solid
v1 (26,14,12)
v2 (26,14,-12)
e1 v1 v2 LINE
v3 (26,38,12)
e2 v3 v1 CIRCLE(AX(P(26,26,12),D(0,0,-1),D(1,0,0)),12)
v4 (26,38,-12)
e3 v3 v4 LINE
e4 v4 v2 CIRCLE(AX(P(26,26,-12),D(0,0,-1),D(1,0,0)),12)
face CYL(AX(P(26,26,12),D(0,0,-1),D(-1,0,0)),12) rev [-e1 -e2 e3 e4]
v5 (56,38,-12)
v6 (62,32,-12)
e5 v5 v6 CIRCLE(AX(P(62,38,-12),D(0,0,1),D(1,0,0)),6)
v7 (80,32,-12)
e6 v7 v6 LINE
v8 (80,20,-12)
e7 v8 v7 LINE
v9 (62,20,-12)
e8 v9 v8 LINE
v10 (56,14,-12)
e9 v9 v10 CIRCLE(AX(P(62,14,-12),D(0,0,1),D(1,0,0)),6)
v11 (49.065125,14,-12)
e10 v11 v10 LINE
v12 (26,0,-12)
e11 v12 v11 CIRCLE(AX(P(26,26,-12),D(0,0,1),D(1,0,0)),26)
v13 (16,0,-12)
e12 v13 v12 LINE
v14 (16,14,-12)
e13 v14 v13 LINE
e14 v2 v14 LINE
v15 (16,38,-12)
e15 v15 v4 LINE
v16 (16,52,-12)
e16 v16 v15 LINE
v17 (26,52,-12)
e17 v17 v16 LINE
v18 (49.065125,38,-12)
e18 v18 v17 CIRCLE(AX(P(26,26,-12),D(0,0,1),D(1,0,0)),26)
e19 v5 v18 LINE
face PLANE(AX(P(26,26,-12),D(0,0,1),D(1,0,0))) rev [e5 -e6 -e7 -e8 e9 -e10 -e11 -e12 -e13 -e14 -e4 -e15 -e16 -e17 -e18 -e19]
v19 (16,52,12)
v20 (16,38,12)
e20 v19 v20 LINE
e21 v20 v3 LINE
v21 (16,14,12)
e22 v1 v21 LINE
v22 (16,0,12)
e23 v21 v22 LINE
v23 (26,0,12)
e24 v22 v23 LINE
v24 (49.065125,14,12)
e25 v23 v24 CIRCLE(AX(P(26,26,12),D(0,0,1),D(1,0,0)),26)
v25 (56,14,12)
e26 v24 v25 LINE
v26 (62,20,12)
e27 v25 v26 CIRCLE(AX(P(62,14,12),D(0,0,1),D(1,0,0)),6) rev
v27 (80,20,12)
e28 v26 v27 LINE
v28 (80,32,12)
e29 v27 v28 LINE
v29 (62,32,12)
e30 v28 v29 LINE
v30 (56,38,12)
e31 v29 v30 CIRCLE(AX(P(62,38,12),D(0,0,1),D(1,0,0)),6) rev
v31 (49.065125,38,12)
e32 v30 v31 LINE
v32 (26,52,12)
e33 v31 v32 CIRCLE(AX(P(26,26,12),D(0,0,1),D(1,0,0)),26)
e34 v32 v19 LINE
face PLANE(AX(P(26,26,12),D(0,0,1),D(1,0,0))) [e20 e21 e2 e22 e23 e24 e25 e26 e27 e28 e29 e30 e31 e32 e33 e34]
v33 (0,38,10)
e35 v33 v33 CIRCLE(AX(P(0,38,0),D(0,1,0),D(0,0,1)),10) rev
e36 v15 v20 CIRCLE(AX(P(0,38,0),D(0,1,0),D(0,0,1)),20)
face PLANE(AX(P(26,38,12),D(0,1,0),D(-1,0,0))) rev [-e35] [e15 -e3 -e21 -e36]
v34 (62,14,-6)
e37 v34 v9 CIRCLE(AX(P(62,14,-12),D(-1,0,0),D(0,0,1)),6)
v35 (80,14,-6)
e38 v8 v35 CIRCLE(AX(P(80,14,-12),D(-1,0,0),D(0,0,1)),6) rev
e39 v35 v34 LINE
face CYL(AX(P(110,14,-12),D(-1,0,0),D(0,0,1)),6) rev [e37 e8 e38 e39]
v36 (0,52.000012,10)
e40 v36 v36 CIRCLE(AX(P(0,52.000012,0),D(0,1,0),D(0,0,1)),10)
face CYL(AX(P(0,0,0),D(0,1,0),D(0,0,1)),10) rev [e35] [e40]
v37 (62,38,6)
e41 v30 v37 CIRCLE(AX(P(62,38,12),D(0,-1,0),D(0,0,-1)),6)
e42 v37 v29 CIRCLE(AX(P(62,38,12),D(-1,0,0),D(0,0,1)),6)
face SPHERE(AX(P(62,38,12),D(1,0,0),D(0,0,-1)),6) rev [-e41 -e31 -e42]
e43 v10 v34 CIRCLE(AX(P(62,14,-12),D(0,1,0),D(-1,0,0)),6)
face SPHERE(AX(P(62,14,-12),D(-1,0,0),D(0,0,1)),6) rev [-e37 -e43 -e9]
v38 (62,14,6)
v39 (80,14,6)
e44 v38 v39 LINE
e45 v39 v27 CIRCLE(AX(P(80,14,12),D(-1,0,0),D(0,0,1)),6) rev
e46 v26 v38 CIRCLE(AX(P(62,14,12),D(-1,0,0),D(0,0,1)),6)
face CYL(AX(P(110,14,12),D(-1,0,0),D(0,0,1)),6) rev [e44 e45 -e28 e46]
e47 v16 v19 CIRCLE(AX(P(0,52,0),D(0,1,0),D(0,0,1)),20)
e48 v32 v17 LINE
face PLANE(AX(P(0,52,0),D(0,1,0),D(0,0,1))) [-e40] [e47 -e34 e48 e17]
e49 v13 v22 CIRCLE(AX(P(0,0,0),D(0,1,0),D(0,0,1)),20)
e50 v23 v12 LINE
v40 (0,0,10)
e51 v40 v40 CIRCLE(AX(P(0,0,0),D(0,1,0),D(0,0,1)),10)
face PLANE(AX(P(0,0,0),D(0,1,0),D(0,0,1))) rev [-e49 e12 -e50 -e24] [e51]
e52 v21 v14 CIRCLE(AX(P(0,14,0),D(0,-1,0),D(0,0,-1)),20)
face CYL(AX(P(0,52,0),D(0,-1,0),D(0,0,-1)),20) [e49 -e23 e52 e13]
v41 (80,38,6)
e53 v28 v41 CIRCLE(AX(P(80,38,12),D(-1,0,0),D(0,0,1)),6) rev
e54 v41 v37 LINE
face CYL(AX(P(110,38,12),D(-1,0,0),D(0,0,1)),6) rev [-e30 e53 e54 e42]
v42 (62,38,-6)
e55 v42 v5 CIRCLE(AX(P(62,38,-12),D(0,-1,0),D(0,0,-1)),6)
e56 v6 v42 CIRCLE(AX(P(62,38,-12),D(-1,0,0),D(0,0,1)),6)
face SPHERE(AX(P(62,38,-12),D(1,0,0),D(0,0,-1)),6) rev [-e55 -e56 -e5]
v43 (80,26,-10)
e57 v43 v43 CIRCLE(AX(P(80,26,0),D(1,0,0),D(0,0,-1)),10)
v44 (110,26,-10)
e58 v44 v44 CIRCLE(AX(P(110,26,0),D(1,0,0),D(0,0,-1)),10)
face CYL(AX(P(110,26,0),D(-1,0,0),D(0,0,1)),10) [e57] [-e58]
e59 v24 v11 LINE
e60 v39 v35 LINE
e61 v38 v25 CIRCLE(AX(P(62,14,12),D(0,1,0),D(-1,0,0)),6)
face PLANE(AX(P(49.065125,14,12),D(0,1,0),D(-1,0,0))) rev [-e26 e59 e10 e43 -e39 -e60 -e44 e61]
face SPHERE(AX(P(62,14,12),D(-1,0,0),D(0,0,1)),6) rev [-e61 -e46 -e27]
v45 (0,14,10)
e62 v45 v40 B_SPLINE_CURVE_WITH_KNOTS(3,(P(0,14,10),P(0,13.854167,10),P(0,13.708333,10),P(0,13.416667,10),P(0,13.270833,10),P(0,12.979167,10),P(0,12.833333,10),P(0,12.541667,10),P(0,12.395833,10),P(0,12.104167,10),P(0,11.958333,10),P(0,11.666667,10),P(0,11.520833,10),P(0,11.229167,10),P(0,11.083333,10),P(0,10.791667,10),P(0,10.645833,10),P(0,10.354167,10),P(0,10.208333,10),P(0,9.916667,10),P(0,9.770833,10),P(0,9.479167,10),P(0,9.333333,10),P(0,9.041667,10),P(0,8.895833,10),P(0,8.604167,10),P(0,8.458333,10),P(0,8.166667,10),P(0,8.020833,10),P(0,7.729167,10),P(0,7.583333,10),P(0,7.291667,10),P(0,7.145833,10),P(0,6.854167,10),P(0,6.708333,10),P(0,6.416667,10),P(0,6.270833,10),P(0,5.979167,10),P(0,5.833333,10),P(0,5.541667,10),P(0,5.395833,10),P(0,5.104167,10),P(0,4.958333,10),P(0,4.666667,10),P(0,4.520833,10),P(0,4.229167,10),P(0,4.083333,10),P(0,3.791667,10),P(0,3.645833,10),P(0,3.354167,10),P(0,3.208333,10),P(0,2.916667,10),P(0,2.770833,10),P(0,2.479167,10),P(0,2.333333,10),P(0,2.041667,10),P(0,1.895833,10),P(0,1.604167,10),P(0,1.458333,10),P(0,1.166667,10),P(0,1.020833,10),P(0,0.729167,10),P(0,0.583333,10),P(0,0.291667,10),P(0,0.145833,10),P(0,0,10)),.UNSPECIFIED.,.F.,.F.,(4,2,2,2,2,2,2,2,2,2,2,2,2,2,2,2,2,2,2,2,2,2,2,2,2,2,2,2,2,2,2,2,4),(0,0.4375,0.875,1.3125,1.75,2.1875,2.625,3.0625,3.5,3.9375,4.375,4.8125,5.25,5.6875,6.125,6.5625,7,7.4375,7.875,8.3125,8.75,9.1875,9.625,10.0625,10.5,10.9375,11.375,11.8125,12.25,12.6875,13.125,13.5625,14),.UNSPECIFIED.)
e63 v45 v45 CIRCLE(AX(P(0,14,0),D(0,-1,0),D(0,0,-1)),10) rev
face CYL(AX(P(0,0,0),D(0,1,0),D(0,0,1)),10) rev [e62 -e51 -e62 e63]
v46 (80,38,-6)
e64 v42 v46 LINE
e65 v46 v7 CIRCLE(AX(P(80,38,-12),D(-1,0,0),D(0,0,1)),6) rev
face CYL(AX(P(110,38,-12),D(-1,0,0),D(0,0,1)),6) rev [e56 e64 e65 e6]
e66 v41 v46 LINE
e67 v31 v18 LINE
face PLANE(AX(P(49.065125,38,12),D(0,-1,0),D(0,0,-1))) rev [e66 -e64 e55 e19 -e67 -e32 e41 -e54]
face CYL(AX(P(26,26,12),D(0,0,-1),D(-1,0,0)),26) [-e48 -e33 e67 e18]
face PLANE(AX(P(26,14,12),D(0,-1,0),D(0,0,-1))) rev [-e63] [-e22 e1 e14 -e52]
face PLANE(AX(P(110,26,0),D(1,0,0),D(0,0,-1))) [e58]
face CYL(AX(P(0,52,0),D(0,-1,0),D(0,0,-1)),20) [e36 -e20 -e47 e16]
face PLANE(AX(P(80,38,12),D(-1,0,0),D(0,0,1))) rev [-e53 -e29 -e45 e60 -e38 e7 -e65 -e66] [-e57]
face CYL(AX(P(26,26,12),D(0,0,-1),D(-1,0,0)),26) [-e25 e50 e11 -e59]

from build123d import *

# Parameters (mm, degrees)
SKETCH1_R               = 20
BOSS_EXTRUDE1_DEPTH     = 52
CUT_EXTRUDE1_DEPTH      = 60.194594348
CUT_EXTRUDE1_DEPTH_BACK = 60.194594348
SKETCH2_R               = 10
BOSS_EXTRUDE8_DEPTH     = 12
SKETCH7_R               = 10
BOSS_EXTRUDE9_DEPTH     = 30
CUT_EXTRUDE2_DEPTH      = 115.47270417
CUT_EXTRUDE2_DEPTH_BACK = 24
SKETCH9_R               = 6
FILLET1_R               = 6
CUT_EXTRUDE3_DEPTH      = 124.304501177
CUT_EXTRUDE3_DEPTH_BACK = 124.304501177
SKETCH11_W              = 42.326213612
SKETCH11_H              = 24


with BuildPart() as part:
    # Sketch1 → Boss-Extrude1 (new body)
    with BuildSketch(Plane(origin=(0, 0, 0), x_dir=(1, 0, 0), z_dir=(0, 1, 0))):
        with Locations(Location((0, 0, 0), (0, 0, 90))):
            Circle(SKETCH1_R)
    extrude(amount=BOSS_EXTRUDE1_DEPTH)

    # Sketch2 → Cut-Extrude1 (cut, two sides: drawn at the far end of the back side and taken through both)
    with BuildSketch(Plane(origin=(0, 52, 0), x_dir=(1, 0, 0), z_dir=(0, 1, 0)).offset(-CUT_EXTRUDE1_DEPTH_BACK)):
        with Locations(Location((0, 0, 0), (0, 0, 270))):
            Circle(SKETCH2_R)
    extrude(amount=CUT_EXTRUDE1_DEPTH + CUT_EXTRUDE1_DEPTH_BACK, mode=Mode.SUBTRACT)

    # Sketch5 → Boss-Extrude8 (add, symmetric)
    with BuildSketch(Plane.XY):
        with BuildLine():
            Line((26, 0), (16, 0))
            Line((16, 0), (16, 14))
            Line((16, 14), (26, 14))
            ThreePointArc((26, 14), (38, 26), (26, 38))
            Line((26, 38), (16, 38))
            Line((16, 38), (16, 52))
            Line((16, 52), (26, 52))
            ThreePointArc((26, 52), (39.490737563, 48.226110771), (49.065125189, 38))
            Line((49.065125189, 38), (80, 38))
            Line((80, 38), (80, 14))
            Line((80, 14), (49.065125189, 14))
            ThreePointArc((49.065125189, 14), (39.490737563, 3.773889229), (26, 0))
        make_face()
    extrude(amount=BOSS_EXTRUDE8_DEPTH, both=True)

    # Sketch7 → Boss-Extrude9 (add)
    with BuildSketch(Plane(origin=(80, 0, 0), x_dir=(0, 0, -1), z_dir=(1, 0, 0))):
        with Locations((0, 26)):
            Circle(SKETCH7_R)
    extrude(amount=BOSS_EXTRUDE9_DEPTH)

    # Sketch9 → Cut-Extrude2 (cut, two sides: drawn at the far end of the back side and taken through both)
    with BuildSketch(Plane(origin=(80, 0, 0), x_dir=(0, 0, -1), z_dir=(1, 0, 0)).offset(-CUT_EXTRUDE2_DEPTH_BACK)):
        with Locations((-12, 38)):
            Circle(SKETCH9_R)
        with Locations((12, 38)):
            Circle(SKETCH9_R)
        with Locations((12, 14)):
            Circle(SKETCH9_R)
        with Locations((-12, 14)):
            Circle(SKETCH9_R)
    extrude(amount=CUT_EXTRUDE2_DEPTH + CUT_EXTRUDE2_DEPTH_BACK, mode=Mode.SUBTRACT)

    # Fillet1
    fillet1_edges = [part.edges().sort_by_distance(p)[0] for p in [
        (56, 18.242640687, -7.757359313),
        (56, 18.242640687, 7.757359313),
        (56, 33.757359313, -7.757359313),
        (56, 33.757359313, 7.757359313),
    ]]
    fillet(fillet1_edges, radius=FILLET1_R - 0.0001)  # a hair under: the kernel refuses the full size

    # Sketch11 → Cut-Extrude3 (cut, two sides: drawn at the far end of the back side and taken through both)
    with BuildSketch(Plane.XY.offset(-CUT_EXTRUDE3_DEPTH_BACK)):
        with Locations((0, 26)):
            Rectangle(SKETCH11_W, SKETCH11_H)
    extrude(amount=CUT_EXTRUDE3_DEPTH + CUT_EXTRUDE3_DEPTH_BACK, mode=Mode.SUBTRACT)


solid = part.part
